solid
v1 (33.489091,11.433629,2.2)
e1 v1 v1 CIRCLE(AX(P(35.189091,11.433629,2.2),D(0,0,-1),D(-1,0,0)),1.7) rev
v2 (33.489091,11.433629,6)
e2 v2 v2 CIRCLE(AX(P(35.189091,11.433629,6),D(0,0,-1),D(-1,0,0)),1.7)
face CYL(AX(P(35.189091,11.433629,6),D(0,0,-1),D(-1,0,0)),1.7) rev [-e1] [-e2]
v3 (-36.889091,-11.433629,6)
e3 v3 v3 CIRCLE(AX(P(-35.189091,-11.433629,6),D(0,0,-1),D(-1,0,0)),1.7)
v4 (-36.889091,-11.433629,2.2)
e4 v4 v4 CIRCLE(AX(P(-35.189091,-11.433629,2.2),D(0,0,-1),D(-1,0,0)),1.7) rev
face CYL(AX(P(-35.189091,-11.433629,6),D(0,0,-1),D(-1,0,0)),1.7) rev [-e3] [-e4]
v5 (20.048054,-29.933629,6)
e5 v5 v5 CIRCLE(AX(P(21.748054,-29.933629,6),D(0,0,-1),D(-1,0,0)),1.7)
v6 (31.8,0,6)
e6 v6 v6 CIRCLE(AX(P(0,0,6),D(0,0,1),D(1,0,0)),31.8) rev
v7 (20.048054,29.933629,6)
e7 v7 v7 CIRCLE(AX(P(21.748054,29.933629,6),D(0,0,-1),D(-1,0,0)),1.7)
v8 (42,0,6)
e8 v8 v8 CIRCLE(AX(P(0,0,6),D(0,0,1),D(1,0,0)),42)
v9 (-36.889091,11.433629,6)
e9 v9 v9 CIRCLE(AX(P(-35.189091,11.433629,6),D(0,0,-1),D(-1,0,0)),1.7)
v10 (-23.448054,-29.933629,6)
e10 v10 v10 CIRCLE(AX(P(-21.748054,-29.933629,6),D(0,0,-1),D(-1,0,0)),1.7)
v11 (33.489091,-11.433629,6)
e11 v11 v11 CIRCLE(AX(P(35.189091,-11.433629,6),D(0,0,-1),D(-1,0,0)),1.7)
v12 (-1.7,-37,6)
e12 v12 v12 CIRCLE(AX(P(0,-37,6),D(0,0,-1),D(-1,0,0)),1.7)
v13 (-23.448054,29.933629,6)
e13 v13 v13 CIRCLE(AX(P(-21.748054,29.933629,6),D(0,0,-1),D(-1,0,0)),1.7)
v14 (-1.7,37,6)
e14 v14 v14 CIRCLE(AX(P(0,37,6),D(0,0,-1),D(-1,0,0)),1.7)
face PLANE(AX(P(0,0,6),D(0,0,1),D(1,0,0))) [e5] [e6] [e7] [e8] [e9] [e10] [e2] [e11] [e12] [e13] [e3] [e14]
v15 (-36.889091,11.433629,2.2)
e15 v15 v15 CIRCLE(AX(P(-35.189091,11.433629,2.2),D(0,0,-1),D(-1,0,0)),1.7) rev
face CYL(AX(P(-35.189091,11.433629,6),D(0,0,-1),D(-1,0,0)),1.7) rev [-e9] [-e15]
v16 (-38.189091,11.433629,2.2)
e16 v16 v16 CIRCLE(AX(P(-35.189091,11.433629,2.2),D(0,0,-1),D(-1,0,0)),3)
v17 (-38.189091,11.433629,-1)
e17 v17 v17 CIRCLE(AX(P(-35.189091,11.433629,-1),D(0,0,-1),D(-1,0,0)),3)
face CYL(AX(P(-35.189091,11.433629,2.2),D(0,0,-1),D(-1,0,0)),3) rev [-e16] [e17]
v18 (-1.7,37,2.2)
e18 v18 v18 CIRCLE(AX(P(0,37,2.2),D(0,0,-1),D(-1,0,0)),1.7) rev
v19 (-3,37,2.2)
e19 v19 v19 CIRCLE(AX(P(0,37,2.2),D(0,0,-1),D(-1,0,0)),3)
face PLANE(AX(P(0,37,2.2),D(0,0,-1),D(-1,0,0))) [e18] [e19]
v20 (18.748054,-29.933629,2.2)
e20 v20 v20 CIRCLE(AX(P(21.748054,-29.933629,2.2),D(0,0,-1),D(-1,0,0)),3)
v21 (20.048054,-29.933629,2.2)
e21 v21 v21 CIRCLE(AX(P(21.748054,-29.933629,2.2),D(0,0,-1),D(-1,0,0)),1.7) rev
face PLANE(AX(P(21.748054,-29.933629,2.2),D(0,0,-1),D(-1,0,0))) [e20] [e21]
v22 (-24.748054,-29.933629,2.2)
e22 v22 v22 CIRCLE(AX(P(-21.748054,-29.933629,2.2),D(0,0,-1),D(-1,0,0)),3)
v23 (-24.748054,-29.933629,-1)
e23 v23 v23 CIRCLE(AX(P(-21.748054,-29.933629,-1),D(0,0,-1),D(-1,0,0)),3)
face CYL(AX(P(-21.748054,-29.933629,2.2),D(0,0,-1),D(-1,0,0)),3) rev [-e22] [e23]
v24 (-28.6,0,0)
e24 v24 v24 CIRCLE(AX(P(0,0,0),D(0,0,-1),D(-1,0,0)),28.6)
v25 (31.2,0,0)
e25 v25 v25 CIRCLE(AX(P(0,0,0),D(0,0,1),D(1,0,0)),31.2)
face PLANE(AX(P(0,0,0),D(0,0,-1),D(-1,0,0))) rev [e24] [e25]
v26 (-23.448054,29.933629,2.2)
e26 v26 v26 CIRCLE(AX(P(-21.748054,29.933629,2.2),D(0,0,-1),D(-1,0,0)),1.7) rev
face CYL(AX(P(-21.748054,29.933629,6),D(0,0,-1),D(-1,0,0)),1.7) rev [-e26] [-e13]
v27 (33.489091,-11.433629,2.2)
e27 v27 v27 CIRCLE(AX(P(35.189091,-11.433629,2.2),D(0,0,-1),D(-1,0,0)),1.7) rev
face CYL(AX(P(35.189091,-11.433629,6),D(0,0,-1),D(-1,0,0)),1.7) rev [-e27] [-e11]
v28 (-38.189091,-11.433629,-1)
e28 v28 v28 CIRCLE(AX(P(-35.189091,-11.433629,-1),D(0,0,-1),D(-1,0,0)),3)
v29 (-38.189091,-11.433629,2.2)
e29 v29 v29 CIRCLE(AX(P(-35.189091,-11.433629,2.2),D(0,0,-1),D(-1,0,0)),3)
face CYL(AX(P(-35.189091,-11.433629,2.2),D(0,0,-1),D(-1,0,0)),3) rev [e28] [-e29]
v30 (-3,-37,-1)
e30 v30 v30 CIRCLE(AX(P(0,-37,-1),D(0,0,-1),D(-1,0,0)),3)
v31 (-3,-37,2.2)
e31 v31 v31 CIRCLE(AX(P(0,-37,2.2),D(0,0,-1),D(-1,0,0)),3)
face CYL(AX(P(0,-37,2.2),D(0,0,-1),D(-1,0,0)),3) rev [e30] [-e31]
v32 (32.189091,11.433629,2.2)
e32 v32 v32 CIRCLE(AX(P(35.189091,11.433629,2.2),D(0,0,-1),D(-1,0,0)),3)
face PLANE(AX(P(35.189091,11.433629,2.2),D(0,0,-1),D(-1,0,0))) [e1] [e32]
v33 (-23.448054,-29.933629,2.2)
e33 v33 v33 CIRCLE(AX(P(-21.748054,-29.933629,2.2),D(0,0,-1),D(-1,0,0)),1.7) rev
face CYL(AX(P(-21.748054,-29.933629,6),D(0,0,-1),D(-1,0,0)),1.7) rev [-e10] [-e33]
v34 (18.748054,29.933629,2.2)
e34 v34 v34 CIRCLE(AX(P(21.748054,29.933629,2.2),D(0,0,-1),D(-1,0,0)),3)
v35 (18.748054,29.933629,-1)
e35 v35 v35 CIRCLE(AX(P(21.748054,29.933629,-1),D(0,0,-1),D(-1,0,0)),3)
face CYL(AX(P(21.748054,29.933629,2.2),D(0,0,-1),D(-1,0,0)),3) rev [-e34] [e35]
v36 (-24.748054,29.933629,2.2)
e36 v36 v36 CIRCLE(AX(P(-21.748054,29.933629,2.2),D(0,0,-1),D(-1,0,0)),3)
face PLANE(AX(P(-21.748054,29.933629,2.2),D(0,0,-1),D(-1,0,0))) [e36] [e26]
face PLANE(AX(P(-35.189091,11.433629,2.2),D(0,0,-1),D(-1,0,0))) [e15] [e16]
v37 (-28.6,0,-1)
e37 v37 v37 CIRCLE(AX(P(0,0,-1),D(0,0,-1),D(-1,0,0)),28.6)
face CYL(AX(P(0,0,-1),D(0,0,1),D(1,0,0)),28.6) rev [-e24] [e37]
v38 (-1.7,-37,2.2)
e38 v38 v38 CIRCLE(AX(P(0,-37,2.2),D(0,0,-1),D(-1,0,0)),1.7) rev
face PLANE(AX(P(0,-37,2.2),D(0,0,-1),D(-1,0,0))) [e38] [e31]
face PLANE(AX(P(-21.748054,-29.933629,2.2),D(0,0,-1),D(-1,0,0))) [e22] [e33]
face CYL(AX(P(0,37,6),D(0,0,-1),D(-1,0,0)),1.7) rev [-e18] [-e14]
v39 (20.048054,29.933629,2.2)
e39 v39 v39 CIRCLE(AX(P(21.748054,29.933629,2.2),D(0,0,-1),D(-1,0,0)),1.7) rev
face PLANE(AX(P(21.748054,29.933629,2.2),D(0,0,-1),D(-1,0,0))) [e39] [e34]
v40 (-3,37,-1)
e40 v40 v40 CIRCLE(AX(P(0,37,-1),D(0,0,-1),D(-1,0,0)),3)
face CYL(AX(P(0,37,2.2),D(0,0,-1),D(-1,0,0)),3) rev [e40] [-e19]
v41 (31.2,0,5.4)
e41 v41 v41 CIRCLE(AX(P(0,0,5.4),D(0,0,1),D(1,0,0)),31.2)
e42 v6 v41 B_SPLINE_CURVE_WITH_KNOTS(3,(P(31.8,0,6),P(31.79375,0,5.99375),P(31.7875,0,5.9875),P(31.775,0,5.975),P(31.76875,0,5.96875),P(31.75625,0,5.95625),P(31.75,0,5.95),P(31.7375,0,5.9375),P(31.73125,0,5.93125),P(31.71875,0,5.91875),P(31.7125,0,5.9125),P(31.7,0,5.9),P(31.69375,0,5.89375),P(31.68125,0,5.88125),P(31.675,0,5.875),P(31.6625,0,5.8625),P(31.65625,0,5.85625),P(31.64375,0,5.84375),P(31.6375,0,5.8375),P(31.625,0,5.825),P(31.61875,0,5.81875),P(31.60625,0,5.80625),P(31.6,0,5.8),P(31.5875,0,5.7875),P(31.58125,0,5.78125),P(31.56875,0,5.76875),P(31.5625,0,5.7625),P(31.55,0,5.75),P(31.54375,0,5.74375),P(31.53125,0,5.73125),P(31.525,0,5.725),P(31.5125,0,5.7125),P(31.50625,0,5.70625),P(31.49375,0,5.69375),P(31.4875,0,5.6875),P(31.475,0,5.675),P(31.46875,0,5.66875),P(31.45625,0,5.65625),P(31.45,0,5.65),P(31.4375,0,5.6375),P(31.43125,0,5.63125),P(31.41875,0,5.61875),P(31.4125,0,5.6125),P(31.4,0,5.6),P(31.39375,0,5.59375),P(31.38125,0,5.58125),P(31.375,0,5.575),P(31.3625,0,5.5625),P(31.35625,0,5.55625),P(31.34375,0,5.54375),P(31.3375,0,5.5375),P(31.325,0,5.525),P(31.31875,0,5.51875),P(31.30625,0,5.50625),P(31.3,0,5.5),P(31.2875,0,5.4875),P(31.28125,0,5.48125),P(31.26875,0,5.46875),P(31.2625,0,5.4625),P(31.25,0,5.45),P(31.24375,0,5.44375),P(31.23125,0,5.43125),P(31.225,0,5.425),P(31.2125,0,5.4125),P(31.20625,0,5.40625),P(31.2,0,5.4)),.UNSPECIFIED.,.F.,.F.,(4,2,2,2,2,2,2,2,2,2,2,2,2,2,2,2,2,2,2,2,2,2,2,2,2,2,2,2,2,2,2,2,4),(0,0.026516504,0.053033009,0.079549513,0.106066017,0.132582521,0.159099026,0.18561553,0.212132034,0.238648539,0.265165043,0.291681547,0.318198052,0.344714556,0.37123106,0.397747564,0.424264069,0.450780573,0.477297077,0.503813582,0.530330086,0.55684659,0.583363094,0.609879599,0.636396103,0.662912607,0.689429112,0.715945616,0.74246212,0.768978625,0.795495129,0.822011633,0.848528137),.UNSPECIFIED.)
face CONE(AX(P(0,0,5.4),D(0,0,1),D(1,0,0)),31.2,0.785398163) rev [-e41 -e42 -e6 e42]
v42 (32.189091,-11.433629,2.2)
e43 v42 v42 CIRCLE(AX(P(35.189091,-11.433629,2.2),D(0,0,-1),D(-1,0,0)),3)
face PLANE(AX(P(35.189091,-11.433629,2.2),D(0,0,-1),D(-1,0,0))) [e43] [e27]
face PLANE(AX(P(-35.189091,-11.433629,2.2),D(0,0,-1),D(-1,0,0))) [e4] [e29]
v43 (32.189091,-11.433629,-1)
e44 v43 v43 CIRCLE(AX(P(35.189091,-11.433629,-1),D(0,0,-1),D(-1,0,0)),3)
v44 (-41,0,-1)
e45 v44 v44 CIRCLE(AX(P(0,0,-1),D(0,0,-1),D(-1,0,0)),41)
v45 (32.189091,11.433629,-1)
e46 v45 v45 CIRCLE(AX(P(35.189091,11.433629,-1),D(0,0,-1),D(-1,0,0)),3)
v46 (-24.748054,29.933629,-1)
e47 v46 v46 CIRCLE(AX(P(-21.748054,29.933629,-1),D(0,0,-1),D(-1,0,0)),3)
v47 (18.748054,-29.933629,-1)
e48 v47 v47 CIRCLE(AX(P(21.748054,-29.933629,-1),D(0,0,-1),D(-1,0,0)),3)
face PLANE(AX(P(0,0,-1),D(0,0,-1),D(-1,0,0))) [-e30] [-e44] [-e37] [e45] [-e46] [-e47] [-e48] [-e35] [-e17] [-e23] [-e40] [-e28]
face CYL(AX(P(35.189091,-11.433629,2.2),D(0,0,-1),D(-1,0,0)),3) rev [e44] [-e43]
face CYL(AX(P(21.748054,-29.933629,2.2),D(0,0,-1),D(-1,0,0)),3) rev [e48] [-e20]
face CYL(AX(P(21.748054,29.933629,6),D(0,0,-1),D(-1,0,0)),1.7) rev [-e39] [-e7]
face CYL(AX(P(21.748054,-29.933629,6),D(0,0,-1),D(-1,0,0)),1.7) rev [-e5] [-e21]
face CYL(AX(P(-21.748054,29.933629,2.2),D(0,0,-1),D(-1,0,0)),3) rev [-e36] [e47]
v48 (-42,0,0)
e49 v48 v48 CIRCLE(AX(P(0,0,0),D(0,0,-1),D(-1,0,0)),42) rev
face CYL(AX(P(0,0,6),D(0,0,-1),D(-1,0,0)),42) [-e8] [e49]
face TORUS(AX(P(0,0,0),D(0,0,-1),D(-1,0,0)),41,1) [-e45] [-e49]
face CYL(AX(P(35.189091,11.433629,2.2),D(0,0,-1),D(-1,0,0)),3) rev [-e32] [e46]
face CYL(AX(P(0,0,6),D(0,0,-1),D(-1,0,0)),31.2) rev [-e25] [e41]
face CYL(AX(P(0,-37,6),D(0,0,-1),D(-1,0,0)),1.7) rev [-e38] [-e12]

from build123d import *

# Parameters (mm, degrees)
ESQUISSE1_R             = 42
ESQUISSE1_R_2           = 31.2
BOSS_EXTRU_1_DEPTH      = 6
BOSS_EXTRU_2_START      = 1
ESQUISSE2_R             = 42
ESQUISSE2_R_2           = 28.6
BOSS_EXTRU_2_DEPTH      = 1
ESQUISSE5_R             = 1.7
ENL_V_MAT_EXTRU_1_DEPTH = 60.808026217
ESQUISSE6_R             = 3
ENL_V_MAT_EXTRU_2_DEPTH = 3.2
CHANFREIN1_SIZE         = 0.6
CONG_2_R                = 1


with BuildPart() as part:
    # Esquisse1 → Boss.-Extru.1 (new body)
    with BuildSketch(Plane.XY):
        Circle(ESQUISSE1_R)
        Circle(ESQUISSE1_R_2, mode=Mode.SUBTRACT)
    extrude(amount=BOSS_EXTRU_1_DEPTH)

    # Esquisse2 → Boss.-Extru.2 (add)
    with BuildSketch(Plane(origin=(0, 0, 0), x_dir=(-1, 0, 0), z_dir=(0, 0, -1)).offset(BOSS_EXTRU_2_START)):
        Circle(ESQUISSE2_R)
        Circle(ESQUISSE2_R_2, mode=Mode.SUBTRACT)
    extrude(amount=-BOSS_EXTRU_2_DEPTH)

    # Esquisse5 → Enlèv. mat.-Extru.1 (cut, through all)
    with BuildSketch(Plane(origin=(0, 0, -1), x_dir=(-1, 0, 0), z_dir=(0, 0, -1))):
        with Locations((0, 37)):
            Circle(ESQUISSE5_R)
        with Locations((21.748054335, 29.933628792)):
            Circle(ESQUISSE5_R)
        with Locations((35.189091103, 11.433628792)):
            Circle(ESQUISSE5_R)
        with Locations((35.189091103, -11.433628792)):
            Circle(ESQUISSE5_R)
        with Locations((21.748054335, -29.933628792)):
            Circle(ESQUISSE5_R)
        with Locations((0, -37)):
            Circle(ESQUISSE5_R)
        with Locations((-21.748054335, -29.933628792)):
            Circle(ESQUISSE5_R)
        with Locations((-35.189091103, -11.433628792)):
            Circle(ESQUISSE5_R)
        with Locations((-35.189091103, 11.433628792)):
            Circle(ESQUISSE5_R)
        with Locations((-21.748054335, 29.933628792)):
            Circle(ESQUISSE5_R)
    extrude(amount=-ENL_V_MAT_EXTRU_1_DEPTH, mode=Mode.SUBTRACT)

    # Esquisse6 → Enlèv. mat.-Extru.2 (cut)
    with BuildSketch(Plane(origin=(0, 0, -1), x_dir=(-1, 0, 0), z_dir=(0, 0, -1))):
        with Locations((0, 37)):
            Circle(ESQUISSE6_R)
        with Locations((21.748054335, 29.933628792)):
            Circle(ESQUISSE6_R)
        with Locations((35.189091103, 11.433628792)):
            Circle(ESQUISSE6_R)
        with Locations((35.189091103, -11.433628792)):
            Circle(ESQUISSE6_R)
        with Locations((21.748054335, -29.933628792)):
            Circle(ESQUISSE6_R)
        with Locations((0, -37)):
            Circle(ESQUISSE6_R)
        with Locations((-21.748054335, -29.933628792)):
            Circle(ESQUISSE6_R)
        with Locations((-35.189091103, -11.433628792)):
            Circle(ESQUISSE6_R)
        with Locations((-35.189091103, 11.433628792)):
            Circle(ESQUISSE6_R)
        with Locations((-21.748054335, 29.933628792)):
            Circle(ESQUISSE6_R)
    extrude(amount=-ENL_V_MAT_EXTRU_2_DEPTH, mode=Mode.SUBTRACT)

    # Chanfrein1
    chanfrein1_edges = [part.edges().sort_by_distance(p)[0] for p in [
        (-31.2, 0, 6),
    ]]
    chamfer(chanfrein1_edges, length=CHANFREIN1_SIZE)

    # Congé2
    cong_2_edges = [part.edges().sort_by_distance(p)[0] for p in [
        (42, 0, -1),
    ]]
    fillet(cong_2_edges, radius=CONG_2_R - 0.0001)  # a hair under: the kernel refuses the full size


solid = part.part
